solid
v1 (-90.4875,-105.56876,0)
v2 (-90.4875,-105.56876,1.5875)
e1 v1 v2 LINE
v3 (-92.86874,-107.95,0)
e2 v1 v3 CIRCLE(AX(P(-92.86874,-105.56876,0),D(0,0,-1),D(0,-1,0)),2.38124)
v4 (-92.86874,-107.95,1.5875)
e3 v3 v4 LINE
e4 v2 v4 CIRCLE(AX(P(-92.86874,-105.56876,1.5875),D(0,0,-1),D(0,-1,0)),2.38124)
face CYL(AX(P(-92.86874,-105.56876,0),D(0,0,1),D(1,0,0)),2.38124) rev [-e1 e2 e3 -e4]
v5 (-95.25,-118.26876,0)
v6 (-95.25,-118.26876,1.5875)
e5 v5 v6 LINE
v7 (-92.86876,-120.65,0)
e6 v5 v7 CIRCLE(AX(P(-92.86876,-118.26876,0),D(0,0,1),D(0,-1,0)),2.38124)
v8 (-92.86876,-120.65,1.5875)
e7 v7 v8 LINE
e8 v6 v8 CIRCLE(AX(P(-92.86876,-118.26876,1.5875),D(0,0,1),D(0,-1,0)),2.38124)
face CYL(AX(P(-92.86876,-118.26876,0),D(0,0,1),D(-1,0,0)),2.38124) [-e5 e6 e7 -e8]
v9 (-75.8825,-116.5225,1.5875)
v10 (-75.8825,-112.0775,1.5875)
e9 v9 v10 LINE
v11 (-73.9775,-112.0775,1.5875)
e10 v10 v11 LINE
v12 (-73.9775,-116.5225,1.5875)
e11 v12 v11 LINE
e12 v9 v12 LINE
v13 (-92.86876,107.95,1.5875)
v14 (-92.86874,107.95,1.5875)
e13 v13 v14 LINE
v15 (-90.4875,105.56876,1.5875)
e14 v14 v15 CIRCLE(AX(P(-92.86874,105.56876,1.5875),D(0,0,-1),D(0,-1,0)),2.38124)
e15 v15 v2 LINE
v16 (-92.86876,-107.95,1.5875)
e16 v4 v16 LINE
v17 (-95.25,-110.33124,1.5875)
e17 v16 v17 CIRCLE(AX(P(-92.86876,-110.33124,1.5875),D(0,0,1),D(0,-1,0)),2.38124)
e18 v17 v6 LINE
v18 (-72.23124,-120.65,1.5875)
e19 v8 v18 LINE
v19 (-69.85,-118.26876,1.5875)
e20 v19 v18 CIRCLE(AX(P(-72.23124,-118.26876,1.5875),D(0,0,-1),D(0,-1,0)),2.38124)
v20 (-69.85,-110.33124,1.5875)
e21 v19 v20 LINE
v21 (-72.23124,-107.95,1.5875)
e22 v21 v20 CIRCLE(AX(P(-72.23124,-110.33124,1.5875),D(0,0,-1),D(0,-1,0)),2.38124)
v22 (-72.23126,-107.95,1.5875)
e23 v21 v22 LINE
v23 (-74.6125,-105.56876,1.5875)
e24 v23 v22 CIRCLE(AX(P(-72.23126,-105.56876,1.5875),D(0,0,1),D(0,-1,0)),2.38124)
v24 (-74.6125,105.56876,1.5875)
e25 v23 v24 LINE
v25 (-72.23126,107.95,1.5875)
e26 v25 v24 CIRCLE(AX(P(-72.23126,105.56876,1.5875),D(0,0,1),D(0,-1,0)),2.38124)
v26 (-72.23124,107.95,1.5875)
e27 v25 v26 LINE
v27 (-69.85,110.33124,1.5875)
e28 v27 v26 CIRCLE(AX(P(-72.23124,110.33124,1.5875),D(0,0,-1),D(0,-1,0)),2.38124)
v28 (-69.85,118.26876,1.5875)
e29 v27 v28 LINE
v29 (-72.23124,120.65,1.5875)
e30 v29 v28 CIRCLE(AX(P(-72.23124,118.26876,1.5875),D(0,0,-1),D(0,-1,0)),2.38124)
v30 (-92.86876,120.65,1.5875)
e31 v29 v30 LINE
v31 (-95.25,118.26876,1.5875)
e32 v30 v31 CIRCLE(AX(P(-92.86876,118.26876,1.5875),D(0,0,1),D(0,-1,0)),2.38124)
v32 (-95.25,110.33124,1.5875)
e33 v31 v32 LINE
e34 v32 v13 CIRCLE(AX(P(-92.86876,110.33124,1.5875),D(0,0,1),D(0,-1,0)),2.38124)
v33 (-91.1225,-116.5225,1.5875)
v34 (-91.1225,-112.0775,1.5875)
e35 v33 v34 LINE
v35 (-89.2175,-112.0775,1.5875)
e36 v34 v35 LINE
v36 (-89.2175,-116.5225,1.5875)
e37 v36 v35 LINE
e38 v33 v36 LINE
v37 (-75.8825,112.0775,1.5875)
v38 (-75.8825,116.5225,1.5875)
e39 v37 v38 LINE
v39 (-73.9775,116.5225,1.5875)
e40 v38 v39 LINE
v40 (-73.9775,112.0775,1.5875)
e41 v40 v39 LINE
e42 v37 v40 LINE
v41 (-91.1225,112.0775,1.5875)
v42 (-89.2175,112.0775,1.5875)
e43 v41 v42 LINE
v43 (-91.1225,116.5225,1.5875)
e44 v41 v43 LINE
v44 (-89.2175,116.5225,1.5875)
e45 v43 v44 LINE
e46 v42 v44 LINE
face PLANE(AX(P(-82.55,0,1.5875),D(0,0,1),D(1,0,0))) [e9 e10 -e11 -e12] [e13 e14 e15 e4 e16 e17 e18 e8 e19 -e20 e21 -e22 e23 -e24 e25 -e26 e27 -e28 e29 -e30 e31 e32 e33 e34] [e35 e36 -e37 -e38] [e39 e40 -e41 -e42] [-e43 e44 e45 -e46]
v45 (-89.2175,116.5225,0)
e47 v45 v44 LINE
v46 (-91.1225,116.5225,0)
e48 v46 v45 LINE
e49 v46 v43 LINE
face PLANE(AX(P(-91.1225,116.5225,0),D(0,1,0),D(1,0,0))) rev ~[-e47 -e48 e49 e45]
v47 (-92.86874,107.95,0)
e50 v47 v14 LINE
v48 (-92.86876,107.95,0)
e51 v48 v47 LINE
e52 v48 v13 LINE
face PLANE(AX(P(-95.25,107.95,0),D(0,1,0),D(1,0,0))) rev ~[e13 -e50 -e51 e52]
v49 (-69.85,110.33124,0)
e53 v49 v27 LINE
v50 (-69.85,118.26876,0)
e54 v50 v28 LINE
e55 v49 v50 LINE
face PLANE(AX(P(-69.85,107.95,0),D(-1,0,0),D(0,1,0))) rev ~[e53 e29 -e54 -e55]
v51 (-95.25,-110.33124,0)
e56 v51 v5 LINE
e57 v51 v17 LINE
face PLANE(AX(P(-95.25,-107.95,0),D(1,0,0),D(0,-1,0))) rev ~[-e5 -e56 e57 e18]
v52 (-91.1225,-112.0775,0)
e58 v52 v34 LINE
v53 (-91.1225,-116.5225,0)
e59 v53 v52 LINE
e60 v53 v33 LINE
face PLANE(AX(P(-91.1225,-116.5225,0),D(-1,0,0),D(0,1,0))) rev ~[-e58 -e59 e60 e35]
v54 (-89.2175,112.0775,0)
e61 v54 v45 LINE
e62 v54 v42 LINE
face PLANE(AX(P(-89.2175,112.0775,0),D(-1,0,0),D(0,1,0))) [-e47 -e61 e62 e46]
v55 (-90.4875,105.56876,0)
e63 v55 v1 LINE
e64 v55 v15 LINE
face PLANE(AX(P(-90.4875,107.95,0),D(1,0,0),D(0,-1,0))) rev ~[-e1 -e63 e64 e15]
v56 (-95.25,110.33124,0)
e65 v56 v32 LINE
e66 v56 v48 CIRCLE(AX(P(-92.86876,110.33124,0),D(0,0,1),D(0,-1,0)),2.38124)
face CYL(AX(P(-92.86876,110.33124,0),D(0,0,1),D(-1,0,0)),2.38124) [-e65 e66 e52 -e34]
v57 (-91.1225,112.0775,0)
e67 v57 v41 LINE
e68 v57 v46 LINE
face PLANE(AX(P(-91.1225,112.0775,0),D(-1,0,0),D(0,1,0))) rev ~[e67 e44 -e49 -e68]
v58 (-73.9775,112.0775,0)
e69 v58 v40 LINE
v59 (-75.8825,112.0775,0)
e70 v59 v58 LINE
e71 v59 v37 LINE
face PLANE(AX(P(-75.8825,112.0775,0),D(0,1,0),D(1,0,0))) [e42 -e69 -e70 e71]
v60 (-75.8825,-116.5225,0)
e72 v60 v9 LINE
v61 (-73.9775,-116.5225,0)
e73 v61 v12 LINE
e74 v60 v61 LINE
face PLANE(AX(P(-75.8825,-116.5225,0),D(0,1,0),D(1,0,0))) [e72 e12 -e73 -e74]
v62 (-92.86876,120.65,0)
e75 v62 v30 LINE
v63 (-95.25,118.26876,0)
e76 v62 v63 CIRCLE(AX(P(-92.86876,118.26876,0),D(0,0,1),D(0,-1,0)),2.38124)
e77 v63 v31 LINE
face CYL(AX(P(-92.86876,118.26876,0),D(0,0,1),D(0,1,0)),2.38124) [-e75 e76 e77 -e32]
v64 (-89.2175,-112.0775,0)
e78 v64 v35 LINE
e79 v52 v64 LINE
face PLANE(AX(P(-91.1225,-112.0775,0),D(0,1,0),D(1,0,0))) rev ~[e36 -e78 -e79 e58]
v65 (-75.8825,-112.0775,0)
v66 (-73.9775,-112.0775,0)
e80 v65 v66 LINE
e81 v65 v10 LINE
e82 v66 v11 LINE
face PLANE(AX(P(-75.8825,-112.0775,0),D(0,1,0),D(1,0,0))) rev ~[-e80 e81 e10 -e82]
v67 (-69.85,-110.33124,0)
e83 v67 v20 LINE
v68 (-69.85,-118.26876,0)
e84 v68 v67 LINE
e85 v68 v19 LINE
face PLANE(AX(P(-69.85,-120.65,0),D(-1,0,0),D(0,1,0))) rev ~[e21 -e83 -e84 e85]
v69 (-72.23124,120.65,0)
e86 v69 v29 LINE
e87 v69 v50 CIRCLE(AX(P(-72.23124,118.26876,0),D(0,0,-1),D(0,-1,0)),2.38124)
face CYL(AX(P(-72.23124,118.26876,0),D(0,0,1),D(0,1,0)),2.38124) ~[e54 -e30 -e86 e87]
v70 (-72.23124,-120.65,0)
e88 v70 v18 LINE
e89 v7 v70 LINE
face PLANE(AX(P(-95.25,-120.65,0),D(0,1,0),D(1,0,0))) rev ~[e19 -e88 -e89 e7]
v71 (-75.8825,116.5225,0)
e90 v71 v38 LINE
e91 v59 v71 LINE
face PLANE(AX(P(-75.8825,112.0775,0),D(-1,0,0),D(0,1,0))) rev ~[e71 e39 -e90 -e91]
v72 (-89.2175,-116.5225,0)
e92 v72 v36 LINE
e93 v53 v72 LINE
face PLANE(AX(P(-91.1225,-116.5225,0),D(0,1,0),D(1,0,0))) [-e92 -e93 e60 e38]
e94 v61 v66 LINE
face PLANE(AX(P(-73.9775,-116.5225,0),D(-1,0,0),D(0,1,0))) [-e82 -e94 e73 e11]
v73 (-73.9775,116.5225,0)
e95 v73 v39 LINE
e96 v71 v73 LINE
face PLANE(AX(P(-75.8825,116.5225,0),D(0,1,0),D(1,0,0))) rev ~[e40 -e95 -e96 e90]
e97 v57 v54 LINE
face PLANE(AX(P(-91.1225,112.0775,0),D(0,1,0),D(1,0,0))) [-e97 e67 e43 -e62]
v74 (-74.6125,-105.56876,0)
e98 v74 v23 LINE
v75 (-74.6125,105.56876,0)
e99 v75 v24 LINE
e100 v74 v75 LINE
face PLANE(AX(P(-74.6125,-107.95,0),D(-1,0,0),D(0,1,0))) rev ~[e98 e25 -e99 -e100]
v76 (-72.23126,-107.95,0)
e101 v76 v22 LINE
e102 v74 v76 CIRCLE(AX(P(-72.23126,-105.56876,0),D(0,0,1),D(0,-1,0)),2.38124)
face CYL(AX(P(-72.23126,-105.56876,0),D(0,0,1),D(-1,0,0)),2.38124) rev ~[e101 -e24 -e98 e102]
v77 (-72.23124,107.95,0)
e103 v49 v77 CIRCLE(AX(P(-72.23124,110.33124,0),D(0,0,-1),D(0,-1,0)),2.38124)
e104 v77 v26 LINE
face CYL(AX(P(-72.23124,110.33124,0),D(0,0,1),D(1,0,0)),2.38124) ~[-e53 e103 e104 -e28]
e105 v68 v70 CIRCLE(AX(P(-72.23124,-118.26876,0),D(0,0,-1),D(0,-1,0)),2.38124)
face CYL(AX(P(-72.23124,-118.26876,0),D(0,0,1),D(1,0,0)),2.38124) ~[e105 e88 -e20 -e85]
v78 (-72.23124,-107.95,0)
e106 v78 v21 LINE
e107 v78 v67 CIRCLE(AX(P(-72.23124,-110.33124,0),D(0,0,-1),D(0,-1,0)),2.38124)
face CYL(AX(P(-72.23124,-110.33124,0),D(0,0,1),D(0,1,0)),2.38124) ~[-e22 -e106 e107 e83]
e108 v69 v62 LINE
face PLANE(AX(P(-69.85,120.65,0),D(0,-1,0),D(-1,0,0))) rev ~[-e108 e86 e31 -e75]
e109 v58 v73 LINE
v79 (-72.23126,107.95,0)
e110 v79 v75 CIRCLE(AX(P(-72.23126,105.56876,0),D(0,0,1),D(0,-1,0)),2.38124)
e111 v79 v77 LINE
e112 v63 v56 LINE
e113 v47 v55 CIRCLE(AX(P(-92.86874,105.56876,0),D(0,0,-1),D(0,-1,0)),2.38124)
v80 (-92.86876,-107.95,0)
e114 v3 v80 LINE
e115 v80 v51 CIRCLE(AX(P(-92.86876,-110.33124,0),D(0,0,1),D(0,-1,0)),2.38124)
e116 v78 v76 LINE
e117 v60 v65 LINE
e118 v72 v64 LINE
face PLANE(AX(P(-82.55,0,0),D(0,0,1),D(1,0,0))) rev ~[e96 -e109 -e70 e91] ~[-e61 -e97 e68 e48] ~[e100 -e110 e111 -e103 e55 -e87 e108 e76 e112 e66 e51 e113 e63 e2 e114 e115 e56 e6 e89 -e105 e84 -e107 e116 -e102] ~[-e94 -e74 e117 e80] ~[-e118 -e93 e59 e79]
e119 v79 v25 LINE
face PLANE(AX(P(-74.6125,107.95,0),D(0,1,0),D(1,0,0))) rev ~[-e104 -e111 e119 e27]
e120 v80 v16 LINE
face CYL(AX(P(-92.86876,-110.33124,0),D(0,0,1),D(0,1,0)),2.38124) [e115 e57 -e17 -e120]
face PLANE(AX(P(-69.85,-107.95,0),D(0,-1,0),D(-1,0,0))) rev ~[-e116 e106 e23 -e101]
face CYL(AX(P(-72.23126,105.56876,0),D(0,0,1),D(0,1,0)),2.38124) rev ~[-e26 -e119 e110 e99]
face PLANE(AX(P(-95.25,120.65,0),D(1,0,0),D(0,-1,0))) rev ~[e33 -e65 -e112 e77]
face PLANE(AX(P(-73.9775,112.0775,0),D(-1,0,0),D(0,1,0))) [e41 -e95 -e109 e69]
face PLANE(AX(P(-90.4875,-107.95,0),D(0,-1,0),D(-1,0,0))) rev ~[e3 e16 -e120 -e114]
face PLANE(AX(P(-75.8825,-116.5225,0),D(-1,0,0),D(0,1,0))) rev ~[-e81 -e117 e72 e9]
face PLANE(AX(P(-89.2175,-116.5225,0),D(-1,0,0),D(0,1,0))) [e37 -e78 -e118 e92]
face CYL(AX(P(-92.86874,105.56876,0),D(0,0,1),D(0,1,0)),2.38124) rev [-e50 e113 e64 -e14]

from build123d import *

# Parameters (mm, degrees)
F0_W     = 1.905
F0_H     = 4.445
F1_DEPTH = 1.5875
F2_R     = 2.38124


# Not quite as in the source:
# - a fillet or chamfer is up to 0.001 mm smaller than in the source, because OpenCascade refuses the exact size


with BuildPart() as f1:
    # F0 (on Top) → F1 (new body)
    with BuildSketch(Plane.XY):
        Polygon((-69.85, 120.65), (-95.25, 120.65), (-95.25, 107.95), (-90.4875, 107.95), (-90.4875, -107.95), (-95.25, -107.95), (-95.25, -120.65), (-69.85, -120.65), (-69.85, -107.95), (-74.6125, -107.95), (-74.6125, 107.95), (-69.85, 107.95), align=None)
        with Locations((-90.17, -114.3)):
            Rectangle(F0_W, F0_H, mode=Mode.SUBTRACT)
        with Locations((-74.93, -114.3)):
            Rectangle(F0_W, F0_H, mode=Mode.SUBTRACT)
        with Locations((-90.17, 114.3)):
            Rectangle(F0_W, F0_H, mode=Mode.SUBTRACT)
        with Locations((-74.93, 114.3)):
            Rectangle(F0_W, F0_H, mode=Mode.SUBTRACT)
    extrude(amount=F1_DEPTH)

    # F2 (radius 2.38125 in the source; OpenCascade refuses exactly that, so slightly less here)
    f2_edges = [f1.edges().sort_by_distance(p)[0] for p in [
        (-90.4875, -107.95, 0.79375),
        (-95.25, -107.95, 0.79375),
        (-95.25, -120.65, 0.79375),
        (-69.85, -120.65, 0.79375),
        (-69.85, -107.95, 0.79375),
        (-74.6125, -107.95, 0.79375),
        (-69.85, 120.65, 0.79375),
        (-69.85, 107.95, 0.79375),
        (-95.25, 120.65, 0.79375),
        (-95.25, 107.95, 0.79375),
        (-74.6125, 107.95, 0.79375),
        (-90.4875, 107.95, 0.79375),
    ]]
    fillet(f2_edges, radius=F2_R)


solid = f1.part
